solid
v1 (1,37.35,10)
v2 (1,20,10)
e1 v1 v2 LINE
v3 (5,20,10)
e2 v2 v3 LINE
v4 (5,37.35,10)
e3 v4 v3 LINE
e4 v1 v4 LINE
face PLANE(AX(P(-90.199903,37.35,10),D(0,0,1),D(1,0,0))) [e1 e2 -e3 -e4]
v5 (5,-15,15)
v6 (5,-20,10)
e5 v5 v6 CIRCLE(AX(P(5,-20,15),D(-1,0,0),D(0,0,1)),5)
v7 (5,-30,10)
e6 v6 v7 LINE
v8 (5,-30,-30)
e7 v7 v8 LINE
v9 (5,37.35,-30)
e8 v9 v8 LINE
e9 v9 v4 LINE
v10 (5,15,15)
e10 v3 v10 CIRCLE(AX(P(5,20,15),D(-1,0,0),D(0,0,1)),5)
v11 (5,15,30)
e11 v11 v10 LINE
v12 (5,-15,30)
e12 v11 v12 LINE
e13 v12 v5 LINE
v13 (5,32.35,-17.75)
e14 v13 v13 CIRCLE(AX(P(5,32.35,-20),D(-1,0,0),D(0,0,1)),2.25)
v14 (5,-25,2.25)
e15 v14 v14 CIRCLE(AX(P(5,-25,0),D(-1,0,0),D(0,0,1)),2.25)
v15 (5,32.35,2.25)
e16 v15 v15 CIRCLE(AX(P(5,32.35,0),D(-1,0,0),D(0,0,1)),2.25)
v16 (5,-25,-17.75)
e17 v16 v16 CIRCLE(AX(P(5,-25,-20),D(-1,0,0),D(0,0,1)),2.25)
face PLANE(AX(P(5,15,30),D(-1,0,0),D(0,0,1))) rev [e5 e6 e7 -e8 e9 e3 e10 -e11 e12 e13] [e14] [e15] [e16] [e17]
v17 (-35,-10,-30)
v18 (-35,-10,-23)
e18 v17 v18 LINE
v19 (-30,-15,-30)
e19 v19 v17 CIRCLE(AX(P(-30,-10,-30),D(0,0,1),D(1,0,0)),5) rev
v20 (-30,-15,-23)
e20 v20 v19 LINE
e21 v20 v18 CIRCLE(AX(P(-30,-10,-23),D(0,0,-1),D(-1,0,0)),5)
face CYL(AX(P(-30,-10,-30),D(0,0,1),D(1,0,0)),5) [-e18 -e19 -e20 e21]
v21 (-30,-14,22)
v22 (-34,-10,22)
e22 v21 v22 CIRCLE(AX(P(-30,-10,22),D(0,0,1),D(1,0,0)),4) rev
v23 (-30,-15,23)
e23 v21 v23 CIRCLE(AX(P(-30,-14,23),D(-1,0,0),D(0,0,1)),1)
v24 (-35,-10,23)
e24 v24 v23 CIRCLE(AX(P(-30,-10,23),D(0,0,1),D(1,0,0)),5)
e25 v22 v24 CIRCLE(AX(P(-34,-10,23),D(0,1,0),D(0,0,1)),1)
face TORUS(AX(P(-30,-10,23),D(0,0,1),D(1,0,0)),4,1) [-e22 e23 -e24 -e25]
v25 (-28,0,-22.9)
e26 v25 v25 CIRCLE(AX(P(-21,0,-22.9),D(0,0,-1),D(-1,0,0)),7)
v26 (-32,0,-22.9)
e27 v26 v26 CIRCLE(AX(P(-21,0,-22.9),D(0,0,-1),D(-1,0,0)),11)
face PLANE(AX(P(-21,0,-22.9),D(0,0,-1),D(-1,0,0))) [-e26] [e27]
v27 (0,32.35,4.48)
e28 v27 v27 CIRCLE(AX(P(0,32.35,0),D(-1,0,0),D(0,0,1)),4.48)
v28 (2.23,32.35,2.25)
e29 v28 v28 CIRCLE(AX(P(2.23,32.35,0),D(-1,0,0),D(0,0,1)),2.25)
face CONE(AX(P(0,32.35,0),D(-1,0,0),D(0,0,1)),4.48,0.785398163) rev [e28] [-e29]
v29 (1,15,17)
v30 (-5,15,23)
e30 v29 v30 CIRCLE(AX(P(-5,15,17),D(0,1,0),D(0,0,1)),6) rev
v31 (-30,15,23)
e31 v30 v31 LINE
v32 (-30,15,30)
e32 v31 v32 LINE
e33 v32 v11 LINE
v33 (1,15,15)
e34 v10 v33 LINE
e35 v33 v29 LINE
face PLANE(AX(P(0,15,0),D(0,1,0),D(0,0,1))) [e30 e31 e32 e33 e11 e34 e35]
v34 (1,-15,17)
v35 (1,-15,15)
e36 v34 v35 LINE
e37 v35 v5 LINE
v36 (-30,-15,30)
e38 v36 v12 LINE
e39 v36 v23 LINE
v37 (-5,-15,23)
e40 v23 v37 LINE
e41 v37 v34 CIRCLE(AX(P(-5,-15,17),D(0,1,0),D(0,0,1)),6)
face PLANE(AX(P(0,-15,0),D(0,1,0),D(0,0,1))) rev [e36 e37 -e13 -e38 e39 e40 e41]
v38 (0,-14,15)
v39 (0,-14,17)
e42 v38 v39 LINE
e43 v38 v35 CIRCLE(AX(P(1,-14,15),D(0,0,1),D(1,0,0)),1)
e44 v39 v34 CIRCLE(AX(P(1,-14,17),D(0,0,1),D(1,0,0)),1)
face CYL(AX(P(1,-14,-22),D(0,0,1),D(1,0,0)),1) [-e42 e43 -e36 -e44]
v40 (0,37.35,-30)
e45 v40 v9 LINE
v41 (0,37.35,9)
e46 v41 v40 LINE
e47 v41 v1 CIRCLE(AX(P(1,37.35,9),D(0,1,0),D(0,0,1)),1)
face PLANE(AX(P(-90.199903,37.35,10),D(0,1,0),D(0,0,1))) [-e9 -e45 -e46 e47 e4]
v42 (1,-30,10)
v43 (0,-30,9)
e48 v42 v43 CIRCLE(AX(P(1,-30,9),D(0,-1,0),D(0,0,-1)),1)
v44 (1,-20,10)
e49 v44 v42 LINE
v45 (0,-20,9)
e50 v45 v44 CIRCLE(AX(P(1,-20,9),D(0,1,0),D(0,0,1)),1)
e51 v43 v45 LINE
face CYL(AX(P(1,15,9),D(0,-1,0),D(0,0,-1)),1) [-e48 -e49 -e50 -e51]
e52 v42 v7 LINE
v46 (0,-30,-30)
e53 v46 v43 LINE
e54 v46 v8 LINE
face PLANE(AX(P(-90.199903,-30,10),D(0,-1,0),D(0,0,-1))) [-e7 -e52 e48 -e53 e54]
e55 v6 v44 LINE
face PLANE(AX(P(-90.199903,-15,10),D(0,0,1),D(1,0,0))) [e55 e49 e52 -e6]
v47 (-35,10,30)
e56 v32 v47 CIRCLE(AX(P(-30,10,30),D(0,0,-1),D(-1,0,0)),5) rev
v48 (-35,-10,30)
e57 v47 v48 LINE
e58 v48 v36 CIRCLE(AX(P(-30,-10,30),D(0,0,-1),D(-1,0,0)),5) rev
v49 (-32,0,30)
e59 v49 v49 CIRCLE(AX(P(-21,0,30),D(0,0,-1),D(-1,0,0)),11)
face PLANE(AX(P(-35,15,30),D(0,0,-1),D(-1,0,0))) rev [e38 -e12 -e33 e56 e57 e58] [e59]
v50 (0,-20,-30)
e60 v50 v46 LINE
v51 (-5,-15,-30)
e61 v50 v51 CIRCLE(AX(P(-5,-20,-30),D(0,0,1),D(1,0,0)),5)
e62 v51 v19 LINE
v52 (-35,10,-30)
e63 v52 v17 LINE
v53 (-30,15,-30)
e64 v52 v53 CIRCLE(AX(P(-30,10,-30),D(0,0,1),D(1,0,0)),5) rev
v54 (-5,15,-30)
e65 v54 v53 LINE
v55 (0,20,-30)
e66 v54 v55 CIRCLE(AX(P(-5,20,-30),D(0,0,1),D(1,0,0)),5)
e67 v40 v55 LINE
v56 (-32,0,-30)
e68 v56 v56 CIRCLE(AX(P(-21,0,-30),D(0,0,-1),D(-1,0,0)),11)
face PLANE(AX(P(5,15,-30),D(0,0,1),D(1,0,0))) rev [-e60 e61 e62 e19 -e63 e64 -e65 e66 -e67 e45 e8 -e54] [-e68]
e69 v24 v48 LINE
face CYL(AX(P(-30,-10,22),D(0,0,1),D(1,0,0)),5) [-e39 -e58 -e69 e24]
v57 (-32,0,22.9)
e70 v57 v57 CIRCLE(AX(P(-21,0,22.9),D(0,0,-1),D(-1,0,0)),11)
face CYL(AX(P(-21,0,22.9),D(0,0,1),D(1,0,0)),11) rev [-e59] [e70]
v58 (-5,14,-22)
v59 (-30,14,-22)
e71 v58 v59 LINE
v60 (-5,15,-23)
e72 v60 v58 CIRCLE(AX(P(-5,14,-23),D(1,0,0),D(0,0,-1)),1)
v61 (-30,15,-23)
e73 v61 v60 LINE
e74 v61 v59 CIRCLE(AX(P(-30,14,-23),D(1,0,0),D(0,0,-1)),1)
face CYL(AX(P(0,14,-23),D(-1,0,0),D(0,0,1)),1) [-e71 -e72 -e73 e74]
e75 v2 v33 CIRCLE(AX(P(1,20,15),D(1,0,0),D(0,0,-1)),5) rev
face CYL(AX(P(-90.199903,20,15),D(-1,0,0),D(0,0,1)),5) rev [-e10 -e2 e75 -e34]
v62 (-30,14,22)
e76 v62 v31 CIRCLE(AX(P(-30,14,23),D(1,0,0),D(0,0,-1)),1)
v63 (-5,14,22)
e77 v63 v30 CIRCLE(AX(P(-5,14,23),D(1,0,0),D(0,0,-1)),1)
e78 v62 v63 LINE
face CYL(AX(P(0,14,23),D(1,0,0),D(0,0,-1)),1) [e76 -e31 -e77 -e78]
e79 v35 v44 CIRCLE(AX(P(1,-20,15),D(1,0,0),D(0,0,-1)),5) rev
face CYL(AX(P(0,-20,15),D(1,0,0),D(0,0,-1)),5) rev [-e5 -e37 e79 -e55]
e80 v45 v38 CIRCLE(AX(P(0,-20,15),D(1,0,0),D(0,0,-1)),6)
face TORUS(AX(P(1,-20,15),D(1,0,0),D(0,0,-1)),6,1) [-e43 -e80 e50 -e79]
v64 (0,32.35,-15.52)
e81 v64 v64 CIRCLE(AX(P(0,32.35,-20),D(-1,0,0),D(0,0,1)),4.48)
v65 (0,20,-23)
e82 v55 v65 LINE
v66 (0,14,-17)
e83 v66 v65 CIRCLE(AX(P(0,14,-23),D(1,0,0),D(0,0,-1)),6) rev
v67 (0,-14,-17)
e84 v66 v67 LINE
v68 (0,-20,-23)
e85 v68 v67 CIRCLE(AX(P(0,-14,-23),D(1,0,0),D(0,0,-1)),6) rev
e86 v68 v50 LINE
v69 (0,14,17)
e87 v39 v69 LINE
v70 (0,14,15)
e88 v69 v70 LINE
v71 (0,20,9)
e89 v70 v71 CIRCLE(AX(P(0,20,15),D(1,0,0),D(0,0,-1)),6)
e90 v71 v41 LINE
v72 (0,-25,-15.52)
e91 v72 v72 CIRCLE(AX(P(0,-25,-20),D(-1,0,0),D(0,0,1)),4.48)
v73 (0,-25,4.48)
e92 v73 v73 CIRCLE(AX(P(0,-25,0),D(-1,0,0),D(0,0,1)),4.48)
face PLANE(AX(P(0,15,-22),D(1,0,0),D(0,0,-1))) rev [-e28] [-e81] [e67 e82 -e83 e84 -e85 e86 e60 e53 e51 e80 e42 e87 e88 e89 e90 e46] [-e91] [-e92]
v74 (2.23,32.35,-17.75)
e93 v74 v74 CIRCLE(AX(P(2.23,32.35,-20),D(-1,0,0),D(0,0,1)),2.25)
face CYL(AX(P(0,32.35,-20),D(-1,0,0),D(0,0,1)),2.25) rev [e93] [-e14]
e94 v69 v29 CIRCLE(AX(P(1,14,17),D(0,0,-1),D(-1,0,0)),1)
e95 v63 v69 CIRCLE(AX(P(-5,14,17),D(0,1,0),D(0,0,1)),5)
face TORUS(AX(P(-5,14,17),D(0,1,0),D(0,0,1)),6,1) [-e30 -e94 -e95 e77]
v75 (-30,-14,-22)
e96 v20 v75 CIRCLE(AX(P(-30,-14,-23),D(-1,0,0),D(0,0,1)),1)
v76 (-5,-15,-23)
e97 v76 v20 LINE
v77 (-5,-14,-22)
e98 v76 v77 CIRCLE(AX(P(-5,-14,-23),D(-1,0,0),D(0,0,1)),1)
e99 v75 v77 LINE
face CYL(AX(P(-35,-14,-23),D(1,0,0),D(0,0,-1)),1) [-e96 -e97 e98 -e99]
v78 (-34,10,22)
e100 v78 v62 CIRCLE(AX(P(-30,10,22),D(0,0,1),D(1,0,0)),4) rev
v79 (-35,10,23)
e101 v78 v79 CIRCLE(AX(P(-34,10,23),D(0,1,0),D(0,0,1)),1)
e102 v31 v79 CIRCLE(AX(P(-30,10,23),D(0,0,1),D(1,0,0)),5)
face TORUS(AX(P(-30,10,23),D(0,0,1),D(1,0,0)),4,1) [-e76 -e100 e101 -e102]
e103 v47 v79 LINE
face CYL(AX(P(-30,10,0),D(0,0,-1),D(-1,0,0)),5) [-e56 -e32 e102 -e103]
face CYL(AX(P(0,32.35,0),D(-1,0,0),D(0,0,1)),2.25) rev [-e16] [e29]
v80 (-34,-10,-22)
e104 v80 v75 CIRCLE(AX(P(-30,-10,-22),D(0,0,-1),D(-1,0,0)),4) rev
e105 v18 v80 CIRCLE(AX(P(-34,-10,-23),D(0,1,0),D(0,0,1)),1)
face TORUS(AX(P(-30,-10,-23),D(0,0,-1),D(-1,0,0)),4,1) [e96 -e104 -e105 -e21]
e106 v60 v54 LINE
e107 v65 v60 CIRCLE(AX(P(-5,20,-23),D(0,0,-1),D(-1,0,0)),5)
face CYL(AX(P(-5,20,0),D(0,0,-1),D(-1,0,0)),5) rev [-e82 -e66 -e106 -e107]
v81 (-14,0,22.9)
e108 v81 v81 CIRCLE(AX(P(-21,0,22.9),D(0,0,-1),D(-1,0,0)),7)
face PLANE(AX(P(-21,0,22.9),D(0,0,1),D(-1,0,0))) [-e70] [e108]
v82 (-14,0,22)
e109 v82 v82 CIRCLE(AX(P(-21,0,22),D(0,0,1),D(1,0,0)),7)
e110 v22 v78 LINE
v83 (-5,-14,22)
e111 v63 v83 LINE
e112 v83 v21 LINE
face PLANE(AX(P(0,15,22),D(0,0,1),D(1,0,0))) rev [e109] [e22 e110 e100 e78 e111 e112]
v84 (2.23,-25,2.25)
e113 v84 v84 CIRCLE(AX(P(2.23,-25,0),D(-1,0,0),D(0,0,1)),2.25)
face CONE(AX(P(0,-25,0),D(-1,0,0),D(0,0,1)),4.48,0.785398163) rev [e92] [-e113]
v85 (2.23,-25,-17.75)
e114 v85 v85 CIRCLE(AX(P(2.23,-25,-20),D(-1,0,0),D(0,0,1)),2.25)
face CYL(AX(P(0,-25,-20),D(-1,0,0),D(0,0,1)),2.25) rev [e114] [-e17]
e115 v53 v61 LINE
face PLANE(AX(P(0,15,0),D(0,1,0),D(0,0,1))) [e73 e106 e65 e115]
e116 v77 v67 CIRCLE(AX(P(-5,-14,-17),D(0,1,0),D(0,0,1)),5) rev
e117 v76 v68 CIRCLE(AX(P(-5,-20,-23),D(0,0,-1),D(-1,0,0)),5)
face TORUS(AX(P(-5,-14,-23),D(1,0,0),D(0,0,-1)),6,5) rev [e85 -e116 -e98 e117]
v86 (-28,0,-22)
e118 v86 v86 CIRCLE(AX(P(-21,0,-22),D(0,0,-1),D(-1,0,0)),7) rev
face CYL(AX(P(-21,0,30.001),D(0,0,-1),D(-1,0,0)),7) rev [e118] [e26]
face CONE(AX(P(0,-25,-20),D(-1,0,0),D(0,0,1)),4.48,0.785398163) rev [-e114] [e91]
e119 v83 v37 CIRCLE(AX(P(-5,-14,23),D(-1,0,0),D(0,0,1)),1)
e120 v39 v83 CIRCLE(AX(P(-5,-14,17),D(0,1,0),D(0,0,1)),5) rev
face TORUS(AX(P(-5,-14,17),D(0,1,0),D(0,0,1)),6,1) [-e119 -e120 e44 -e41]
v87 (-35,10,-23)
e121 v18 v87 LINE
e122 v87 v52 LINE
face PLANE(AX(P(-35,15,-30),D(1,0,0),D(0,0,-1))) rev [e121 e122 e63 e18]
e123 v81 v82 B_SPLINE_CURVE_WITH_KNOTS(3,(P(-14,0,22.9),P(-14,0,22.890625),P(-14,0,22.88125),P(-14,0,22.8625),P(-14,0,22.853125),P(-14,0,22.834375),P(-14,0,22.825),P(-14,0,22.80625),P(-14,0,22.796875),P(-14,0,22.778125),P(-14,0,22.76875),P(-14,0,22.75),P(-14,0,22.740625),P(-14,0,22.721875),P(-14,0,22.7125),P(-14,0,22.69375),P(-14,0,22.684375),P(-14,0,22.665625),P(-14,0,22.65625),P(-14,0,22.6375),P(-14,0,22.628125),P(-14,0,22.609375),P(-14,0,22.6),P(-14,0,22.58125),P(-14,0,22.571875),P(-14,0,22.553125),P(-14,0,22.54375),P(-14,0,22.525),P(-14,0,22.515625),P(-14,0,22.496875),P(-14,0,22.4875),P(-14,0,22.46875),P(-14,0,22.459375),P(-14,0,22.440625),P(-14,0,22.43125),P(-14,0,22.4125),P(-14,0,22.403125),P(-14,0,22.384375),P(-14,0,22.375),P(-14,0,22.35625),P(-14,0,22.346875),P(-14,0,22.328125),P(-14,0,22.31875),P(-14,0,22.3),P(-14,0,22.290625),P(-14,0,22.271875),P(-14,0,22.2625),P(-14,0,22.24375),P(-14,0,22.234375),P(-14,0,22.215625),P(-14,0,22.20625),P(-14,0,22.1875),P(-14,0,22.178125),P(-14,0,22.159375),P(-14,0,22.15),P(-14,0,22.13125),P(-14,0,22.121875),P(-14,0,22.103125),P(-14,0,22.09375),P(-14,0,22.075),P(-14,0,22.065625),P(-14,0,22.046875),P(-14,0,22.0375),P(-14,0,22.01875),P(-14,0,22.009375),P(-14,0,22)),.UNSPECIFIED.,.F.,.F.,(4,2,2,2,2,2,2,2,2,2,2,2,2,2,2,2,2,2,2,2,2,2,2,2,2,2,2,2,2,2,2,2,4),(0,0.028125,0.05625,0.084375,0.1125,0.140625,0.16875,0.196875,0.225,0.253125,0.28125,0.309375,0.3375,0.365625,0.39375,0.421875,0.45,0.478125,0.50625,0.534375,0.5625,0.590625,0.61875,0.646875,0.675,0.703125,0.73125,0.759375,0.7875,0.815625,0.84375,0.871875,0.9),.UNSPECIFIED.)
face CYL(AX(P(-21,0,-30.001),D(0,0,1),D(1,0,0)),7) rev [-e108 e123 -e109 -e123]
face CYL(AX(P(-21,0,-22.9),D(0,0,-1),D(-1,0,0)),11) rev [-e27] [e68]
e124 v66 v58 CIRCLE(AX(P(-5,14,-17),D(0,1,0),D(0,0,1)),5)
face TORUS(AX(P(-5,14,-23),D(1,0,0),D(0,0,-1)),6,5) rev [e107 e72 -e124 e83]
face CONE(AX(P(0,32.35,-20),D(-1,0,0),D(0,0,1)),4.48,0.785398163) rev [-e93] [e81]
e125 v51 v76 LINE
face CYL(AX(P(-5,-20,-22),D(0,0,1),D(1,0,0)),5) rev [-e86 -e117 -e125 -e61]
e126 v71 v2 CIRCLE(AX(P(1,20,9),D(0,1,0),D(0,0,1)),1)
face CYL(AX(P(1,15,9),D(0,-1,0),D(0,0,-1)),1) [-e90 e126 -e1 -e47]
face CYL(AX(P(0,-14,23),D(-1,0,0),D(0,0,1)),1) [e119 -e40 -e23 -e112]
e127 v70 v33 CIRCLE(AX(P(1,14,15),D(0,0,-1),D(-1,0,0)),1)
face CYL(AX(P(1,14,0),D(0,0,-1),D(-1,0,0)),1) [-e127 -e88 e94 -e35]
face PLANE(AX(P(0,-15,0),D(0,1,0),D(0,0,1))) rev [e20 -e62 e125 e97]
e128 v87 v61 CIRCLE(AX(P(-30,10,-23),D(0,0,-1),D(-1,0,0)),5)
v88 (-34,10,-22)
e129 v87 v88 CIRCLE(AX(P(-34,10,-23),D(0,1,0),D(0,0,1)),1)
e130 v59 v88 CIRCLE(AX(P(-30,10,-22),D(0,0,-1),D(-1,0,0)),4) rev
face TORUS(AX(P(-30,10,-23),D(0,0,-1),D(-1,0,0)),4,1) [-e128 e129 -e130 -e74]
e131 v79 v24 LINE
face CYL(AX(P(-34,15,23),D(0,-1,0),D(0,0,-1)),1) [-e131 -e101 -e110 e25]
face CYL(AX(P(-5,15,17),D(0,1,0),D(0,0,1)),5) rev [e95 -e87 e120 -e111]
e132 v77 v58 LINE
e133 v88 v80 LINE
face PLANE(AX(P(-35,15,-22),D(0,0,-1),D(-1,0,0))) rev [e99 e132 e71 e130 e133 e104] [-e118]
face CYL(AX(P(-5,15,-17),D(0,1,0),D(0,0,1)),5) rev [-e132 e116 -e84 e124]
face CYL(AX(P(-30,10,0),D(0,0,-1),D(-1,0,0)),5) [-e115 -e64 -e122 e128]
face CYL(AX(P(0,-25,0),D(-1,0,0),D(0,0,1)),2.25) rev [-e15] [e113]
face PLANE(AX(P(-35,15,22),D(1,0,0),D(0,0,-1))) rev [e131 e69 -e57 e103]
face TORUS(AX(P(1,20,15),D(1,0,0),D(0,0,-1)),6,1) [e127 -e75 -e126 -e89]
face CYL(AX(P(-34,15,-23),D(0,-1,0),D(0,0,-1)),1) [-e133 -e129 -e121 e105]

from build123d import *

# Parameters (mm, degrees)
BOSS_EXTRUDE1_DEPTH           = 15
BOSS_EXTRUDE2_DEPTH           = 5
SKETCH3_R                     = 11
CUT_EXTRUDE1_DEPTH            = 7.1
CUT_EXTRUDE2_REACH            = 75.61
SKETCH4_R                     = 7
FILLET1_R                     = 5
FILLET2_R                     = 5
FILLET3_R                     = 1
FILLET6_START                 = -30
FILLET6_DEPTH                 = 6.9999999
FILLET6_2_ANGLE               = 90
FILLET6_3_ANGLE               = 90
CSK_FOR_M4_SFHCS1_D           = 4.5
CSK_FOR_M4_SFHCS1_CSINK_D     = 8.96
CSK_FOR_M4_SFHCS1_CSINK_ANGLE = 90


with BuildPart() as part:
    # Sketch2 → Boss-Extrude1 (new, symmetric)
    with BuildSketch(Plane(origin=(0, 0, 0), x_dir=(1, 0, 0), z_dir=(0, 1, 0))):
        Polygon((-35, 22), (0, 22), (0, -22), (-35, -22), (-35, -30), (5, -30), (5, 30), (-35, 30), align=None)
    extrude(amount=BOSS_EXTRUDE1_DEPTH, both=True)

    # Sketch5 → Boss-Extrude2 (add)
    with BuildSketch(Plane(origin=(5, 0, 0), x_dir=(0, 0, -1), z_dir=(1, 0, 0))):
        Polygon((-10, 37.35), (30, 37.35), (30, -30), (-10, -30), (-10, -15), (-30, -15), (-30, 15), (-10, 15), align=None)
    extrude(amount=-BOSS_EXTRUDE2_DEPTH)

    # Sketch3 → Cut-Extrude1 (cut)
    with BuildSketch(Plane(origin=(0, 0, -30), x_dir=(-1, 0, 0), z_dir=(0, 0, -1))):
        with Locations((21, 0)):
            Circle(SKETCH3_R)
    cut_extrude1 = extrude(amount=-CUT_EXTRUDE1_DEPTH, mode=Mode.SUBTRACT)

    # Sketch4 → Cut-Extrude2 (cut, up to next)
    with BuildSketch(Plane(origin=(0, 0, -22.9), x_dir=(-1, 0, 0), z_dir=(0, 0, -1)), mode=Mode.PRIVATE) as cut_extrude2_sk1:
        with Locations((21, 0)):
            Circle(SKETCH4_R)
    cut_extrude2_tool1 = extrude(cut_extrude2_sk1.sketch, amount=-CUT_EXTRUDE2_REACH, mode=Mode.PRIVATE) & part.part
    cut_extrude2 = cut_extrude2_tool1.solids().sort_by_distance((-21, 0, -22.9))[0]
    add(cut_extrude2, mode=Mode.SUBTRACT)

    # Mirror1: Cut-Extrude1, Cut-Extrude2 across plane
    add(cut_extrude1.mirror(Plane.XY), mode=Mode.SUBTRACT)
    add(cut_extrude2.mirror(Plane.XY), mode=Mode.SUBTRACT)

    # Fillet1
    fillet1_edges = [part.edges().sort_by_distance(p)[0] for p in [
        (0, 0, 22),
        (0, 0, -22),
    ]]
    fillet(fillet1_edges, radius=FILLET1_R)

    # Fillet2
    fillet2_edges = [part.edges().sort_by_distance(p)[0] for p in [
        (-35, -15, -26),
        (-35, 15, 26),
        (2.5, -15, 10),
        (2.5, 15, 10),
        (-35, 15, -26),
        (-35, -15, 26),
    ]]
    fillet(fillet2_edges, radius=FILLET2_R)

    # Fillet3
    # the kernel refuses this fillet: 1 mm, written as the material it takes off along each edge
    with BuildSketch(Plane(origin=(-5, 15, 17), x_dir=(1, 0, 0), z_dir=(0, 0, -1))) as fillet3_piece_1:
        with BuildLine():
            CenterArc((5 + FILLET3_R, FILLET3_R), FILLET3_R, 180, 90)
            Line((5 + FILLET3_R, 0), (5, 0))
            Line((5, 0), (5, FILLET3_R))
        make_face()
    revolve(axis=Axis((-5, 15, 17), (0, -1, 0)), revolution_arc=90, mode=Mode.SUBTRACT)
    with BuildSketch(Plane(origin=(-5, 15, -17), x_dir=(0, 0, -1), z_dir=(-1, 0, 0))) as fillet3_piece_2_section:
        with BuildLine():
            CenterArc((5 + FILLET3_R, FILLET3_R), FILLET3_R, 180, 90)
            Line((5 + FILLET3_R, 0), (5, 0))
            Line((5, 0), (5, FILLET3_R))
        make_face()
    fillet3_piece_2 = revolve(axis=Axis((-5, 15, -17), (0, -1, 0)), revolution_arc=138.720976341, mode=Mode.PRIVATE)
    fillet3_piece_2 = split(fillet3_piece_2, bisect_by=Plane(origin=(0, 15, -17), z_dir=(-1, 0, 0)), keep=Keep.TOP, mode=Mode.PRIVATE)
    add(fillet3_piece_2, mode=Mode.SUBTRACT)
    with BuildSketch(Plane(origin=(-30, 15, -22), x_dir=(0, -1, 0), z_dir=(1, 0, 0)), Plane(origin=(-5, -15, 22), x_dir=(0, 0, 1), z_dir=(-1, 0, 0))) as fillet3_piece_3:
        with BuildLine():
            CenterArc((FILLET3_R, FILLET3_R), FILLET3_R, 180, 90)
            Line((0, FILLET3_R), (0, 0))
            Line((0, 0), (FILLET3_R, 0))
        make_face()
    extrude(amount=25, mode=Mode.SUBTRACT)
    with BuildSketch(Plane(origin=(-30, 10, -22), x_dir=(0, 1, 0), z_dir=(1, 0, 0))) as fillet3_piece_4:
        with BuildLine():
            CenterArc((5 - FILLET3_R, -FILLET3_R), FILLET3_R, 0, 90)
            Line((5, -FILLET3_R), (5, 0))
            Line((5, 0), (5 - FILLET3_R, 0))
        make_face()
    revolve(axis=Axis((-30, 10, -22), (0, 0, 1)), revolution_arc=90, mode=Mode.SUBTRACT)
    with BuildSketch(Plane(origin=(-35, 10, -22), x_dir=(1, 0, 0), z_dir=(0, -1, 0)), Plane(origin=(-35, -10, 22), x_dir=(1, 0, 0), z_dir=(0, 1, 0))) as fillet3_piece_5:
        with BuildLine():
            CenterArc((FILLET3_R, -FILLET3_R), FILLET3_R, 90, 90)
            Line((0, -FILLET3_R), (0, 0))
            Line((0, 0), (FILLET3_R, 0))
        make_face()
    extrude(amount=20, mode=Mode.SUBTRACT)
    with BuildSketch(Plane(origin=(-30, -10, -22), x_dir=(-1, 0, 0), z_dir=(0, 1, 0))) as fillet3_piece_6:
        with BuildLine():
            CenterArc((5 - FILLET3_R, -FILLET3_R), FILLET3_R, 0, 90)
            Line((5, -FILLET3_R), (5, 0))
            Line((5, 0), (5 - FILLET3_R, 0))
        make_face()
    revolve(axis=Axis((-30, -10, -22), (0, 0, 1)), revolution_arc=90, mode=Mode.SUBTRACT)
    with BuildSketch(Plane(origin=(-30, -15, -22), x_dir=(0, 1, 0), z_dir=(1, 0, 0)), Plane(origin=(-5, 15, 22), x_dir=(0, 0, 1), z_dir=(-1, 0, 0))) as fillet3_piece_7:
        with BuildLine():
            CenterArc((FILLET3_R, -FILLET3_R), FILLET3_R, 90, 90)
            Line((0, -FILLET3_R), (0, 0))
            Line((0, 0), (FILLET3_R, 0))
        make_face()
    extrude(amount=25, mode=Mode.SUBTRACT)
    with BuildSketch(Plane(origin=(-5, -15, -17), x_dir=(0, 0, -1), z_dir=(-1, 0, 0))) as fillet3_piece_8_section:
        with BuildLine():
            CenterArc((5 + FILLET3_R, -FILLET3_R), FILLET3_R, 90, 90)
            Line((5, -FILLET3_R), (5, 0))
            Line((5, 0), (5 + FILLET3_R, 0))
        make_face()
    fillet3_piece_8 = revolve(axis=Axis((-5, -15, -17), (0, -1, 0)), revolution_arc=138.720976341, mode=Mode.PRIVATE)
    fillet3_piece_8 = split(fillet3_piece_8, bisect_by=Plane(origin=(0, -15, -17), z_dir=(-1, 0, 0)), keep=Keep.TOP, mode=Mode.PRIVATE)
    add(fillet3_piece_8, mode=Mode.SUBTRACT)
    with BuildSketch(Plane(origin=(-5, -15, 17), x_dir=(1, 0, 0), z_dir=(0, 0, -1))) as fillet3_piece_9:
        with BuildLine():
            CenterArc((5 + FILLET3_R, -FILLET3_R), FILLET3_R, 90, 90)
            Line((5, -FILLET3_R), (5, 0))
            Line((5, 0), (5 + FILLET3_R, 0))
        make_face()
    revolve(axis=Axis((-5, -15, 17), (0, -1, 0)), revolution_arc=90, mode=Mode.SUBTRACT)
    with BuildSketch(Plane(origin=(-30, -10, 22), x_dir=(0, -1, 0), z_dir=(1, 0, 0))) as fillet3_piece_10:
        with BuildLine():
            CenterArc((5 - FILLET3_R, -FILLET3_R), FILLET3_R, 0, 90)
            Line((5, -FILLET3_R), (5, 0))
            Line((5, 0), (5 - FILLET3_R, 0))
        make_face()
    revolve(axis=Axis((-30, -10, 22), (0, 0, -1)), revolution_arc=90, mode=Mode.SUBTRACT)
    with BuildSketch(Plane(origin=(-30, 10, 22), x_dir=(0, 1, 0), z_dir=(1, 0, 0))) as fillet3_piece_11:
        with BuildLine():
            CenterArc((5 - FILLET3_R, FILLET3_R), FILLET3_R, 270, 90)
            Line((5, FILLET3_R), (5, 0))
            Line((5, 0), (5 - FILLET3_R, 0))
        make_face()
    revolve(axis=Axis((-30, 10, 22), (0, 0, 1)), revolution_arc=90, mode=Mode.SUBTRACT)
    with BuildSketch(Plane(origin=(0, 15, 15), x_dir=(0, -1, 0), z_dir=(0, 0, 1))) as fillet3_piece_12:
        with BuildLine():
            CenterArc((FILLET3_R, FILLET3_R), FILLET3_R, 180, 90)
            Line((0, FILLET3_R), (0, 0))
            Line((0, 0), (FILLET3_R, 0))
        make_face()
    extrude(amount=2, mode=Mode.SUBTRACT)
    with BuildSketch(Plane(origin=(0, -15, 15), x_dir=(0, 1, 0), z_dir=(0, 0, 1))) as fillet3_piece_13:
        with BuildLine():
            CenterArc((FILLET3_R, -FILLET3_R), FILLET3_R, 90, 90)
            Line((0, -FILLET3_R), (0, 0))
            Line((0, 0), (FILLET3_R, 0))
        make_face()
    extrude(amount=2, mode=Mode.SUBTRACT)
    with BuildSketch(Plane(origin=(0, 20, 10), x_dir=(0, 0, -1), z_dir=(0, 1, 0))) as fillet3_piece_14:
        with BuildLine():
            CenterArc((FILLET3_R, -FILLET3_R), FILLET3_R, 90, 90)
            Line((0, -FILLET3_R), (0, 0))
            Line((0, 0), (FILLET3_R, 0))
        make_face()
    extrude(amount=19.85, mode=Mode.SUBTRACT)
    with BuildSketch(Plane(origin=(0, 20, 15), x_dir=(0, -1, 0), z_dir=(0, 0, 1))) as fillet3_piece_15:
        with BuildLine():
            CenterArc((5 + FILLET3_R, FILLET3_R), FILLET3_R, 180, 90)
            Line((5, FILLET3_R), (5, 0))
            Line((5, 0), (5 + FILLET3_R, 0))
        make_face()
    revolve(axis=Axis((0, 20, 15), (1, 0, 0)), revolution_arc=90, mode=Mode.SUBTRACT)
    with BuildSketch(Plane(origin=(0, -32.5, 10), x_dir=(0, 0, -1), z_dir=(0, 1, 0))) as fillet3_piece_16:
        with BuildLine():
            CenterArc((FILLET3_R, -FILLET3_R), FILLET3_R, 90, 90)
            Line((0, -FILLET3_R), (0, 0))
            Line((0, 0), (FILLET3_R, 0))
        make_face()
    extrude(amount=12.5, mode=Mode.SUBTRACT)
    with BuildSketch(Plane(origin=(0, -20, 15), x_dir=(0, 0, -1), z_dir=(0, -1, 0))) as fillet3_piece_17:
        with BuildLine():
            CenterArc((5 + FILLET3_R, FILLET3_R), FILLET3_R, 180, 90)
            Line((5, FILLET3_R), (5, 0))
            Line((5, 0), (5 + FILLET3_R, 0))
        make_face()
    revolve(axis=Axis((0, -20, 15), (1, 0, 0)), revolution_arc=90, mode=Mode.SUBTRACT)

    # Fillet6: read off the stored shape, not the designer's step
    # Fillet6 outline → Fillet6 (add)
    with BuildSketch(Plane.XY.offset(FILLET6_START)):
        with BuildLine():
            Line((-5, 15), (0, 15))
            Line((0, 15), (0, 20))
            ThreePointArc((0, 20), (-1.464466094, 16.464466094), (-5, 15))
        make_face()
        with BuildLine():
            ThreePointArc((-5, -15), (-1.464466094, -16.464466094), (0, -20))
            Line((0, -20), (0, -15))
            Line((0, -15), (-5, -15))
        make_face()
    extrude(amount=FILLET6_DEPTH)

    # Fillet6 2 outline → Fillet6 2 (revolve)
    with BuildSketch(Plane(origin=(0, -14, -23), x_dir=(0, 0, 1), z_dir=(0, 1, 0))):
        with BuildLine():
            ThreePointArc((1, -5), (2.464466094, -1.464466094), (6, 0))
            Line((6, 0), (1, 0))
            Line((1, 0), (1, -5))
        make_face()
    revolve(axis=Axis((0, -14, -23), (1, 0, 0)), revolution_arc=FILLET6_2_ANGLE)

    # Fillet6 3 outline → Fillet6 3 (revolve)
    with BuildSketch(Plane(origin=(0, 14, -23), x_dir=(0, 1, 0), z_dir=(0, 0, -1))):
        with BuildLine():
            ThreePointArc((1, -5), (2.464466094, -1.464466094), (6, 0))
            Line((6, 0), (1, 0))
            Line((1, 0), (1, -5))
        make_face()
    revolve(axis=Axis((0, 14, -23), (1, 0, 0)), revolution_arc=FILLET6_3_ANGLE)

    # CSK for M4 SFHCS1 (through all)
    with Locations(Plane.ZY):
        with Locations((0, 32.35), (-20, -25), (0, -25), (-20, 32.35)):
            CounterSinkHole(CSK_FOR_M4_SFHCS1_D / 2, CSK_FOR_M4_SFHCS1_CSINK_D / 2, counter_sink_angle=CSK_FOR_M4_SFHCS1_CSINK_ANGLE)


solid = part.part
